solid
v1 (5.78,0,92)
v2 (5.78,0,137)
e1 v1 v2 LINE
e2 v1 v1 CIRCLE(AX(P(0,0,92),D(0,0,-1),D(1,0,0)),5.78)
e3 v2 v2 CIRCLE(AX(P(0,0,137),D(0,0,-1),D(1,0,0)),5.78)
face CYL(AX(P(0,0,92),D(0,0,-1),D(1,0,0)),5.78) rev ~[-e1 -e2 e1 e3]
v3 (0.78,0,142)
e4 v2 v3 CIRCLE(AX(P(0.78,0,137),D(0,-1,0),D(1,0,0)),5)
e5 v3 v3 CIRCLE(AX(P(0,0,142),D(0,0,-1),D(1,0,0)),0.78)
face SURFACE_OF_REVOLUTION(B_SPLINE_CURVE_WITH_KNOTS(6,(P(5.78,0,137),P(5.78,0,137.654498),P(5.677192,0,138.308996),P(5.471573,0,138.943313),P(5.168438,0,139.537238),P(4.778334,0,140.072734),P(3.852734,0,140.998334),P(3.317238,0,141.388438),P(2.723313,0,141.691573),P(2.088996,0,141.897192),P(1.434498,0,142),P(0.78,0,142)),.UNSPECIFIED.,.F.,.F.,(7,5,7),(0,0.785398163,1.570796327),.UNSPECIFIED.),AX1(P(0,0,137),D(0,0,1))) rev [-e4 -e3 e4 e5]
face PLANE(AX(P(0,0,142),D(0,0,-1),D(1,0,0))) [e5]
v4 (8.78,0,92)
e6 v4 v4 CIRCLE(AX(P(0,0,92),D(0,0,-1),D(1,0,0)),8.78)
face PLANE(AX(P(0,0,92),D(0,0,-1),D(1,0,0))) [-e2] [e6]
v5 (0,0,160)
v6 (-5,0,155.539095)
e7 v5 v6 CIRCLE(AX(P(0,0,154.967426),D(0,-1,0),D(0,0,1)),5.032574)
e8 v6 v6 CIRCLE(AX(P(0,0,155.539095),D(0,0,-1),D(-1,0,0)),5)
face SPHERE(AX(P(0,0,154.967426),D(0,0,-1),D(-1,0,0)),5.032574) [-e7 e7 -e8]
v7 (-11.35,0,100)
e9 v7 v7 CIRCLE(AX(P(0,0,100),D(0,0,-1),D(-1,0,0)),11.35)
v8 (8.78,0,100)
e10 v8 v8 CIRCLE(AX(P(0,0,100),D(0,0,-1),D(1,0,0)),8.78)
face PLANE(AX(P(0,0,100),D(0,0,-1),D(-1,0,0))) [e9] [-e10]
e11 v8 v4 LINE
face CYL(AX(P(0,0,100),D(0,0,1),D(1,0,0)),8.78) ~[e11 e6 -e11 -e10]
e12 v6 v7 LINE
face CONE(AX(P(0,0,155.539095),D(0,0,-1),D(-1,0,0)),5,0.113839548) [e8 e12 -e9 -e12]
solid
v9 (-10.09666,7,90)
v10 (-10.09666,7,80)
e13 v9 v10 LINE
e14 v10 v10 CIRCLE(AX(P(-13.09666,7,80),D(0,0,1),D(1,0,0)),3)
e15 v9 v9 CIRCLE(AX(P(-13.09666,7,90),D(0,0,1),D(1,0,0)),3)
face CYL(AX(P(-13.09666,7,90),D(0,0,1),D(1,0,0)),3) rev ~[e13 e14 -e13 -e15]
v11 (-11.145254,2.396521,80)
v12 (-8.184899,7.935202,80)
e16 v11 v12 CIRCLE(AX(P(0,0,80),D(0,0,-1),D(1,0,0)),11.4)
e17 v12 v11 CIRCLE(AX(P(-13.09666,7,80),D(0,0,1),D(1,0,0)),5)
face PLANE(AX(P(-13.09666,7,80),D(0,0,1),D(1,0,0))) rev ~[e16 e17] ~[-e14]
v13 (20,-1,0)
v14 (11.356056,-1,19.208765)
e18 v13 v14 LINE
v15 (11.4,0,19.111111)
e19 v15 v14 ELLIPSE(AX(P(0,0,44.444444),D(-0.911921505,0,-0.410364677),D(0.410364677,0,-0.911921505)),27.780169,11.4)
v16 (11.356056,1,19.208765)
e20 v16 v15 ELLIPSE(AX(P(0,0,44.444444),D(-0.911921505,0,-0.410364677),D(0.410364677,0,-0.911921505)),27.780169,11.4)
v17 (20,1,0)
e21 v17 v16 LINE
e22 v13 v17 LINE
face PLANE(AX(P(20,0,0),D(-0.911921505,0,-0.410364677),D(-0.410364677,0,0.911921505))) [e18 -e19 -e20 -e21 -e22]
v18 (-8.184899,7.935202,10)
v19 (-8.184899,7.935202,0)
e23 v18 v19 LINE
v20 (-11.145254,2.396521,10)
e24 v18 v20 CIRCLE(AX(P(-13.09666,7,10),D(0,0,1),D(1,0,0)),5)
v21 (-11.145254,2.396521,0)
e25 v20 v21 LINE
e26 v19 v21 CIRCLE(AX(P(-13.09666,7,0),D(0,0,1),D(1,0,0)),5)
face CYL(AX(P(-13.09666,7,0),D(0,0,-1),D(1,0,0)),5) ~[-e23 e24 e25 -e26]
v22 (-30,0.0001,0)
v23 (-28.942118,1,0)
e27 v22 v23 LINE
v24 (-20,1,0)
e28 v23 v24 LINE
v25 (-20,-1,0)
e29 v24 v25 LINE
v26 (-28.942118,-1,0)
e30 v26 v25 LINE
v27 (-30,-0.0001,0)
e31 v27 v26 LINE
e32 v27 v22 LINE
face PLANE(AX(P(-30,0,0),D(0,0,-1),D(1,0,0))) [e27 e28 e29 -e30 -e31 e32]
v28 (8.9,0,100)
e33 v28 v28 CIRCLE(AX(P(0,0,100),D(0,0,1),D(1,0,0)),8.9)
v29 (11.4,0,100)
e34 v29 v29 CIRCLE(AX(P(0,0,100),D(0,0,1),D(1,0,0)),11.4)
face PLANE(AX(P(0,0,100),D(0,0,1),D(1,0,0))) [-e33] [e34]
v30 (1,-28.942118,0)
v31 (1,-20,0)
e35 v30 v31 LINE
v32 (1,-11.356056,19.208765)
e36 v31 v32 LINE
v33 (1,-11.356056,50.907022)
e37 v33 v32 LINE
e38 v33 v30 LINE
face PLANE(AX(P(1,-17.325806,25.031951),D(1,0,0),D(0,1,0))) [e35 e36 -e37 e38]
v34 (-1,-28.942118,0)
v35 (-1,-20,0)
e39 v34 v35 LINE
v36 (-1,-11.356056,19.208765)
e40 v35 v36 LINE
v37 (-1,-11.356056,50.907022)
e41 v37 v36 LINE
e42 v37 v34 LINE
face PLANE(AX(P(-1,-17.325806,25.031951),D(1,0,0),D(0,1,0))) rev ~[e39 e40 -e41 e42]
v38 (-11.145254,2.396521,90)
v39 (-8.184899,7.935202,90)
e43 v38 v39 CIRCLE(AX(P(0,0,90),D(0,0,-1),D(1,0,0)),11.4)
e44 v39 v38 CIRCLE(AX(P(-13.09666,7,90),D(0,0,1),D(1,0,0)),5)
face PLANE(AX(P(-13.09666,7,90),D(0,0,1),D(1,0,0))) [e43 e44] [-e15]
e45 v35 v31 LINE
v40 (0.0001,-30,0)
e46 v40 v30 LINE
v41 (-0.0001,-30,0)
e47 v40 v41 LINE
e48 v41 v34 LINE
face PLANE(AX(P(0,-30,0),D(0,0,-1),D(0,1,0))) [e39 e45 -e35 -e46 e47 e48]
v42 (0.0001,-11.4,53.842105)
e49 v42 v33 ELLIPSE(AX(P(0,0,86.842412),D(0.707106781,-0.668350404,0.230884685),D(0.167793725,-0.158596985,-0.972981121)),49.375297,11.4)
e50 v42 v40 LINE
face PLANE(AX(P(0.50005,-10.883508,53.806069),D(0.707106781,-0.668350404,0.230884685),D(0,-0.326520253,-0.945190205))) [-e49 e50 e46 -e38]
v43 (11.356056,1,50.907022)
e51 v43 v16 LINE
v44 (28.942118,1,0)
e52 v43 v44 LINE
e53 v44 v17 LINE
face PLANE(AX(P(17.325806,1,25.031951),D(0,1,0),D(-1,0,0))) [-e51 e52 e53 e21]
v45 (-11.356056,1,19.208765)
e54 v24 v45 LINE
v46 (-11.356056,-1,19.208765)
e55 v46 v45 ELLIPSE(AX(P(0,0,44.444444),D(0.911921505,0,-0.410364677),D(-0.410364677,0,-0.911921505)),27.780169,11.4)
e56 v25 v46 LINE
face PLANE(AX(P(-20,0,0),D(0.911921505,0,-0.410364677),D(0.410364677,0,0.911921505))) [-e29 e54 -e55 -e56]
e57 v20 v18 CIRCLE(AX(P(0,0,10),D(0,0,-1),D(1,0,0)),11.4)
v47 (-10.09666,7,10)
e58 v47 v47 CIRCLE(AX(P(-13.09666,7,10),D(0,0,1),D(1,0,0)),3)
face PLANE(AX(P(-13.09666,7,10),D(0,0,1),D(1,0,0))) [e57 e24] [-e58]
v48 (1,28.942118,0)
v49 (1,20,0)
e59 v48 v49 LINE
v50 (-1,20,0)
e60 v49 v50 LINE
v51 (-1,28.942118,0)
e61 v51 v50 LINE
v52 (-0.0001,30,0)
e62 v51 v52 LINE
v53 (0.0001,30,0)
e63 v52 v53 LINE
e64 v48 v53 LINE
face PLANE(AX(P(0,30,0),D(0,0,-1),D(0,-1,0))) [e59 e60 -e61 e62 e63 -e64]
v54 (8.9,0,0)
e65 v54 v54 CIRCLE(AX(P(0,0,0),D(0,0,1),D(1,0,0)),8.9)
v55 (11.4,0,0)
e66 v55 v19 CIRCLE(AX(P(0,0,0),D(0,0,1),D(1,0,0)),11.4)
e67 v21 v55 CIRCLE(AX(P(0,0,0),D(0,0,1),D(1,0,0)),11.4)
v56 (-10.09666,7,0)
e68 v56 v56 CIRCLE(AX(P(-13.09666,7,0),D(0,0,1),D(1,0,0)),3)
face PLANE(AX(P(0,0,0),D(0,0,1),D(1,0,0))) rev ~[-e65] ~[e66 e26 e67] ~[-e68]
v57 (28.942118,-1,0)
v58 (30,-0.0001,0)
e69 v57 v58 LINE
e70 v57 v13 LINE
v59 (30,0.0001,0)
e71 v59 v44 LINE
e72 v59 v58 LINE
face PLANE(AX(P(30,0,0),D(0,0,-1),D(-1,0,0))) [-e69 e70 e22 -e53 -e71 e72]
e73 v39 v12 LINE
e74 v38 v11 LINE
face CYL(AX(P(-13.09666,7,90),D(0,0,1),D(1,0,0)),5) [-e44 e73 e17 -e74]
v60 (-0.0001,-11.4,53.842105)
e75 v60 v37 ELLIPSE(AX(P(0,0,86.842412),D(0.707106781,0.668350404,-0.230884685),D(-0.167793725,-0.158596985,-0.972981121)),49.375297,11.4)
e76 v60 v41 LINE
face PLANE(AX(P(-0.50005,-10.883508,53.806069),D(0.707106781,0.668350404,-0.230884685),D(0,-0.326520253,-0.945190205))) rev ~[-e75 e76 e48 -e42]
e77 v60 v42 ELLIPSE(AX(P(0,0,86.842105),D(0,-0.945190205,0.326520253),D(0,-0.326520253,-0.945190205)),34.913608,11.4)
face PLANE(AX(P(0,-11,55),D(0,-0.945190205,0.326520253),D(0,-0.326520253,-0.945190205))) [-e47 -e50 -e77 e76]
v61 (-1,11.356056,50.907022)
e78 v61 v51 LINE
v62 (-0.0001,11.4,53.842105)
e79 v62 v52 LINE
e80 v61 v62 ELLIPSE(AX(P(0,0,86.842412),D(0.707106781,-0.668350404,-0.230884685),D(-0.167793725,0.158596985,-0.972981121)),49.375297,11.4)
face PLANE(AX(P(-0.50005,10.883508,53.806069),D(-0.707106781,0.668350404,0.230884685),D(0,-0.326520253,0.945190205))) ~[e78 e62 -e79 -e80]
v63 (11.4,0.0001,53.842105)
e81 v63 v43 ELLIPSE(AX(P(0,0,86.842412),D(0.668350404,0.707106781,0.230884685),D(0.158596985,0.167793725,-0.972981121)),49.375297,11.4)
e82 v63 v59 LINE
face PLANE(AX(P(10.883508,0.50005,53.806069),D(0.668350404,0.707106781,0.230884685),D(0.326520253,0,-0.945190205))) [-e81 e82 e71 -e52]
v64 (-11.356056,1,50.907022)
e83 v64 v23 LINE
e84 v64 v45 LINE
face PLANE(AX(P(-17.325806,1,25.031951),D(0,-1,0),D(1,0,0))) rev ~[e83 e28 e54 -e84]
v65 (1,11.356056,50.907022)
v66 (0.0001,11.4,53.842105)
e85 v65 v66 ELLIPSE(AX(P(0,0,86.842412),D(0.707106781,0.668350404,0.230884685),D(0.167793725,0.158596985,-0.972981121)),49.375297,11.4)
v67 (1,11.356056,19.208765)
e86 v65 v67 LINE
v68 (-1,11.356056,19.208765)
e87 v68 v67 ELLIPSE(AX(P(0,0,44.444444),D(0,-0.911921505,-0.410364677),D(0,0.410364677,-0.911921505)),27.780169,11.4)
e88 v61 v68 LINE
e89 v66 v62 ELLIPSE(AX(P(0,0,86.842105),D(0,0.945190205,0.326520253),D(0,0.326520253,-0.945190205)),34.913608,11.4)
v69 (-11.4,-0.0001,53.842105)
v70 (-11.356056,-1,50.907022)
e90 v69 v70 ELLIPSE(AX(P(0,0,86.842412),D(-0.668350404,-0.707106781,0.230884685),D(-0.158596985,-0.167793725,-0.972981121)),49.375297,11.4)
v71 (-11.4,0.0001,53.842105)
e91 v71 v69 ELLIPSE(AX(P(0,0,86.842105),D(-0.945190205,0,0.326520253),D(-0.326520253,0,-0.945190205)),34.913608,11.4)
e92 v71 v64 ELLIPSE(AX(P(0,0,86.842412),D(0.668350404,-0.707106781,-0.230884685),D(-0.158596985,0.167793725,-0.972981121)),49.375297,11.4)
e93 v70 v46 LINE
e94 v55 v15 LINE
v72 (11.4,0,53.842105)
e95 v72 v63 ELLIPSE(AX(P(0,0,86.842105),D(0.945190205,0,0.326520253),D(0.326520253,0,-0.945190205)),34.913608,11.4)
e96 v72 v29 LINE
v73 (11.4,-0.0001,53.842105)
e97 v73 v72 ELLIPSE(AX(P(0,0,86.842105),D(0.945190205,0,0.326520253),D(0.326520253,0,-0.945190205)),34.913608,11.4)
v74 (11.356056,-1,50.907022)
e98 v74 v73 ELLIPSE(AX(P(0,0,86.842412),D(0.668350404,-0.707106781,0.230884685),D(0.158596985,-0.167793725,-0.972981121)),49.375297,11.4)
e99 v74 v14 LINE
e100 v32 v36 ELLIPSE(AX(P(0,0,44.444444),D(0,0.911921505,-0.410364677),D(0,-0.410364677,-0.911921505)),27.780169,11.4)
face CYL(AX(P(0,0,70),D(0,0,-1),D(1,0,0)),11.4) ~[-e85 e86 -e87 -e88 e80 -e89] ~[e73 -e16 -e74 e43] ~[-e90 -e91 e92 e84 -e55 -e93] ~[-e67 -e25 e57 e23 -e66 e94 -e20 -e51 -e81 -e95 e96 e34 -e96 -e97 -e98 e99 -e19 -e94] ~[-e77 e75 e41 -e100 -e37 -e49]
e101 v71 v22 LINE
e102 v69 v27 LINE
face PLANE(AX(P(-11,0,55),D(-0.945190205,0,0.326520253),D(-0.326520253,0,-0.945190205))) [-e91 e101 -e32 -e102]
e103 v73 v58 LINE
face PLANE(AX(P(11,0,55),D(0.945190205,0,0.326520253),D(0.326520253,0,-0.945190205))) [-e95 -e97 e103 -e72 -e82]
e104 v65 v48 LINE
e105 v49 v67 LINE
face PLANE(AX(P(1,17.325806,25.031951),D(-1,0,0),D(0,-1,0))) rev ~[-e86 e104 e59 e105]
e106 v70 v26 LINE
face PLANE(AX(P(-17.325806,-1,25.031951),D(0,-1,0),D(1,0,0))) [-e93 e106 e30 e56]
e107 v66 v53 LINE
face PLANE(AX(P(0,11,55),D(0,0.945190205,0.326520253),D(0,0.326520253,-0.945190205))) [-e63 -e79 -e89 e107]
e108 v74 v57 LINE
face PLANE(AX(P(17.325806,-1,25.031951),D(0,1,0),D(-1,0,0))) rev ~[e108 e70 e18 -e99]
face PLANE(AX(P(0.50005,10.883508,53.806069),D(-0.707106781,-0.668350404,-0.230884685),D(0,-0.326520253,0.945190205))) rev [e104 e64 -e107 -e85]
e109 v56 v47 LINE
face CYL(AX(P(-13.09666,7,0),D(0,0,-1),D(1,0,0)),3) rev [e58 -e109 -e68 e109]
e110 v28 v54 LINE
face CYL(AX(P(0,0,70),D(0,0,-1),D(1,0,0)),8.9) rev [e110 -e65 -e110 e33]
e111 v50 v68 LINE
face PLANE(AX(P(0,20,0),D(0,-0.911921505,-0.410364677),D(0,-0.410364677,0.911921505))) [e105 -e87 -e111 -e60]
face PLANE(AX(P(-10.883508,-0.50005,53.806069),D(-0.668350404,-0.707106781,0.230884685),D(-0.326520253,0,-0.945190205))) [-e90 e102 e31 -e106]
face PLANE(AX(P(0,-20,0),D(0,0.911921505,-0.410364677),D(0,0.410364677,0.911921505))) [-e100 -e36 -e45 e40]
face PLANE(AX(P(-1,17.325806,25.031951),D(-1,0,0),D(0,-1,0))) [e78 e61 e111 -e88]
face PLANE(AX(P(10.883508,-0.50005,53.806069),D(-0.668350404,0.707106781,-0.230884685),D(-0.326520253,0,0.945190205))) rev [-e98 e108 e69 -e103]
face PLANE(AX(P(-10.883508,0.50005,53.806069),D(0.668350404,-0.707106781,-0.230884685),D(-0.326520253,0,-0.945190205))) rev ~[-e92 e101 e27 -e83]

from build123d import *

# Parameters (mm, degrees)
F0_R            = 11.4
F0_R_2          = 8.9
F1_DEPTH        = 70
F7_DEPTH        = 1
F7_COPIES_COUNT = 4
F8_SIZE         = 0.9999
F2_R            = 11.4
F2_R_2          = 8.9
F9_DEPTH        = 30
F10_R           = 8.78
F11_DEPTH       = 8
F13_R           = 5
F13_R_2         = 3
F14_DEPTH       = 10
F15_R           = 5
F15_R_2         = 3
F16_DEPTH       = 10
F17_R           = 5.78
F18_DEPTH       = 50
F19_R           = 5


# Not quite as in the source:
# - a fillet or chamfer is up to 0.001 mm smaller than in the source, because OpenCascade refuses the exact size
# - a pattern or mirror of a feature is missing from the dataset's text; its kind, count and spacing are read off the source's solid


with BuildPart() as f1:
    # F0 (on Top) → F1 (new body)
    with BuildSketch(Plane.XY):
        Circle(F0_R)
        Circle(F0_R_2, mode=Mode.SUBTRACT)
    extrude(amount=F1_DEPTH)

    # F6 (on Front) → F7 (join, symmetric)
    with BuildSketch(Plane.XZ):
        Polygon((-30, 0), (-20, 0), (-11, 20), (-11, 55), align=None)
    f7 = extrude(amount=F7_DEPTH, both=True)

    # F7_copies: F7 ×4 about axis
    f7_copies_axis = Axis((0, 0, 0), (0, 0, 1))
    for i in range(1, F7_COPIES_COUNT):
        add(f7.rotate(f7_copies_axis, i * 360 / F7_COPIES_COUNT))

    # F8 (size 1 in the source; OpenCascade refuses exactly that, so slightly less here)
    f8_edges = [f1.edges().sort_by_distance(p)[0] for p in [
        (-20.678028, -1, 26.984656),
        (-20.678028, 1, 26.984656),
        (20.678028, -1, 26.984656),
        (20.678028, 1, 26.984656),
        (-1, 20.678028, 26.984656),
        (1, 20.678028, 26.984656),
        (1, -20.678028, 26.984656),
        (-1, -20.678028, 26.984656),
    ]]
    chamfer(f8_edges, length=F8_SIZE)

    # F2 (on face) → F9 (join)
    with BuildSketch(Plane.XY.offset(70)):
        Circle(F2_R)
        Circle(F2_R_2, mode=Mode.SUBTRACT)
    extrude(amount=F9_DEPTH)

    # F13 (on offset) → F14 (join)
    with BuildSketch(Plane.XY.offset(90)):
        with Locations((-13.0966598795, 7)):
            Circle(F13_R)
        with Locations((-13.0966598795, 7)):
            Circle(F13_R_2, mode=Mode.SUBTRACT)
    extrude(amount=-F14_DEPTH)

    # F15 (on Top) → F16 (join)
    with BuildSketch(Plane.XY):
        with Locations((-13.0966598795, 7)):
            Circle(F15_R)
        with Locations((-13.0966598795, 7)):
            Circle(F15_R_2, mode=Mode.SUBTRACT)
    extrude(amount=F16_DEPTH)


with BuildPart() as f5:
    # F4 (on Front) → F5 (revolve)
    with BuildSketch(Plane.XZ):
        with BuildLine():
            Line((-5, 155.5390949025), (-11.35, 100))
            Line((-11.35, 100), (0, 100))
            Line((0, 100), (0, 160))
            ThreePointArc((0, 160), (-3.3503609615, 158.7226734906), (-5, 155.5390949025))
        make_face()
    revolve(axis=Axis((0, 0, 130), (0, 0, -1)))

    # F10 (on face) → F11 (join)
    with BuildSketch(Plane(origin=(0, 0, 100), x_dir=(1, 0, 0), z_dir=(0, 0, -1))):
        Circle(F10_R)
    extrude(amount=F11_DEPTH)

    # F17 (on face) → F18 (cut)
    with BuildSketch(Plane(origin=(0, 0, 92), x_dir=(1, 0, 0), z_dir=(0, 0, -1))):
        Circle(F17_R)
    extrude(amount=-F18_DEPTH, mode=Mode.SUBTRACT)

    # F19
    f19_edges = [f5.edges().sort_by_distance(p)[0] for p in [
        (-5.78, 0, 142),
    ]]
    fillet(f19_edges, radius=F19_R)


solid = Compound([f1.part, f5.part])
